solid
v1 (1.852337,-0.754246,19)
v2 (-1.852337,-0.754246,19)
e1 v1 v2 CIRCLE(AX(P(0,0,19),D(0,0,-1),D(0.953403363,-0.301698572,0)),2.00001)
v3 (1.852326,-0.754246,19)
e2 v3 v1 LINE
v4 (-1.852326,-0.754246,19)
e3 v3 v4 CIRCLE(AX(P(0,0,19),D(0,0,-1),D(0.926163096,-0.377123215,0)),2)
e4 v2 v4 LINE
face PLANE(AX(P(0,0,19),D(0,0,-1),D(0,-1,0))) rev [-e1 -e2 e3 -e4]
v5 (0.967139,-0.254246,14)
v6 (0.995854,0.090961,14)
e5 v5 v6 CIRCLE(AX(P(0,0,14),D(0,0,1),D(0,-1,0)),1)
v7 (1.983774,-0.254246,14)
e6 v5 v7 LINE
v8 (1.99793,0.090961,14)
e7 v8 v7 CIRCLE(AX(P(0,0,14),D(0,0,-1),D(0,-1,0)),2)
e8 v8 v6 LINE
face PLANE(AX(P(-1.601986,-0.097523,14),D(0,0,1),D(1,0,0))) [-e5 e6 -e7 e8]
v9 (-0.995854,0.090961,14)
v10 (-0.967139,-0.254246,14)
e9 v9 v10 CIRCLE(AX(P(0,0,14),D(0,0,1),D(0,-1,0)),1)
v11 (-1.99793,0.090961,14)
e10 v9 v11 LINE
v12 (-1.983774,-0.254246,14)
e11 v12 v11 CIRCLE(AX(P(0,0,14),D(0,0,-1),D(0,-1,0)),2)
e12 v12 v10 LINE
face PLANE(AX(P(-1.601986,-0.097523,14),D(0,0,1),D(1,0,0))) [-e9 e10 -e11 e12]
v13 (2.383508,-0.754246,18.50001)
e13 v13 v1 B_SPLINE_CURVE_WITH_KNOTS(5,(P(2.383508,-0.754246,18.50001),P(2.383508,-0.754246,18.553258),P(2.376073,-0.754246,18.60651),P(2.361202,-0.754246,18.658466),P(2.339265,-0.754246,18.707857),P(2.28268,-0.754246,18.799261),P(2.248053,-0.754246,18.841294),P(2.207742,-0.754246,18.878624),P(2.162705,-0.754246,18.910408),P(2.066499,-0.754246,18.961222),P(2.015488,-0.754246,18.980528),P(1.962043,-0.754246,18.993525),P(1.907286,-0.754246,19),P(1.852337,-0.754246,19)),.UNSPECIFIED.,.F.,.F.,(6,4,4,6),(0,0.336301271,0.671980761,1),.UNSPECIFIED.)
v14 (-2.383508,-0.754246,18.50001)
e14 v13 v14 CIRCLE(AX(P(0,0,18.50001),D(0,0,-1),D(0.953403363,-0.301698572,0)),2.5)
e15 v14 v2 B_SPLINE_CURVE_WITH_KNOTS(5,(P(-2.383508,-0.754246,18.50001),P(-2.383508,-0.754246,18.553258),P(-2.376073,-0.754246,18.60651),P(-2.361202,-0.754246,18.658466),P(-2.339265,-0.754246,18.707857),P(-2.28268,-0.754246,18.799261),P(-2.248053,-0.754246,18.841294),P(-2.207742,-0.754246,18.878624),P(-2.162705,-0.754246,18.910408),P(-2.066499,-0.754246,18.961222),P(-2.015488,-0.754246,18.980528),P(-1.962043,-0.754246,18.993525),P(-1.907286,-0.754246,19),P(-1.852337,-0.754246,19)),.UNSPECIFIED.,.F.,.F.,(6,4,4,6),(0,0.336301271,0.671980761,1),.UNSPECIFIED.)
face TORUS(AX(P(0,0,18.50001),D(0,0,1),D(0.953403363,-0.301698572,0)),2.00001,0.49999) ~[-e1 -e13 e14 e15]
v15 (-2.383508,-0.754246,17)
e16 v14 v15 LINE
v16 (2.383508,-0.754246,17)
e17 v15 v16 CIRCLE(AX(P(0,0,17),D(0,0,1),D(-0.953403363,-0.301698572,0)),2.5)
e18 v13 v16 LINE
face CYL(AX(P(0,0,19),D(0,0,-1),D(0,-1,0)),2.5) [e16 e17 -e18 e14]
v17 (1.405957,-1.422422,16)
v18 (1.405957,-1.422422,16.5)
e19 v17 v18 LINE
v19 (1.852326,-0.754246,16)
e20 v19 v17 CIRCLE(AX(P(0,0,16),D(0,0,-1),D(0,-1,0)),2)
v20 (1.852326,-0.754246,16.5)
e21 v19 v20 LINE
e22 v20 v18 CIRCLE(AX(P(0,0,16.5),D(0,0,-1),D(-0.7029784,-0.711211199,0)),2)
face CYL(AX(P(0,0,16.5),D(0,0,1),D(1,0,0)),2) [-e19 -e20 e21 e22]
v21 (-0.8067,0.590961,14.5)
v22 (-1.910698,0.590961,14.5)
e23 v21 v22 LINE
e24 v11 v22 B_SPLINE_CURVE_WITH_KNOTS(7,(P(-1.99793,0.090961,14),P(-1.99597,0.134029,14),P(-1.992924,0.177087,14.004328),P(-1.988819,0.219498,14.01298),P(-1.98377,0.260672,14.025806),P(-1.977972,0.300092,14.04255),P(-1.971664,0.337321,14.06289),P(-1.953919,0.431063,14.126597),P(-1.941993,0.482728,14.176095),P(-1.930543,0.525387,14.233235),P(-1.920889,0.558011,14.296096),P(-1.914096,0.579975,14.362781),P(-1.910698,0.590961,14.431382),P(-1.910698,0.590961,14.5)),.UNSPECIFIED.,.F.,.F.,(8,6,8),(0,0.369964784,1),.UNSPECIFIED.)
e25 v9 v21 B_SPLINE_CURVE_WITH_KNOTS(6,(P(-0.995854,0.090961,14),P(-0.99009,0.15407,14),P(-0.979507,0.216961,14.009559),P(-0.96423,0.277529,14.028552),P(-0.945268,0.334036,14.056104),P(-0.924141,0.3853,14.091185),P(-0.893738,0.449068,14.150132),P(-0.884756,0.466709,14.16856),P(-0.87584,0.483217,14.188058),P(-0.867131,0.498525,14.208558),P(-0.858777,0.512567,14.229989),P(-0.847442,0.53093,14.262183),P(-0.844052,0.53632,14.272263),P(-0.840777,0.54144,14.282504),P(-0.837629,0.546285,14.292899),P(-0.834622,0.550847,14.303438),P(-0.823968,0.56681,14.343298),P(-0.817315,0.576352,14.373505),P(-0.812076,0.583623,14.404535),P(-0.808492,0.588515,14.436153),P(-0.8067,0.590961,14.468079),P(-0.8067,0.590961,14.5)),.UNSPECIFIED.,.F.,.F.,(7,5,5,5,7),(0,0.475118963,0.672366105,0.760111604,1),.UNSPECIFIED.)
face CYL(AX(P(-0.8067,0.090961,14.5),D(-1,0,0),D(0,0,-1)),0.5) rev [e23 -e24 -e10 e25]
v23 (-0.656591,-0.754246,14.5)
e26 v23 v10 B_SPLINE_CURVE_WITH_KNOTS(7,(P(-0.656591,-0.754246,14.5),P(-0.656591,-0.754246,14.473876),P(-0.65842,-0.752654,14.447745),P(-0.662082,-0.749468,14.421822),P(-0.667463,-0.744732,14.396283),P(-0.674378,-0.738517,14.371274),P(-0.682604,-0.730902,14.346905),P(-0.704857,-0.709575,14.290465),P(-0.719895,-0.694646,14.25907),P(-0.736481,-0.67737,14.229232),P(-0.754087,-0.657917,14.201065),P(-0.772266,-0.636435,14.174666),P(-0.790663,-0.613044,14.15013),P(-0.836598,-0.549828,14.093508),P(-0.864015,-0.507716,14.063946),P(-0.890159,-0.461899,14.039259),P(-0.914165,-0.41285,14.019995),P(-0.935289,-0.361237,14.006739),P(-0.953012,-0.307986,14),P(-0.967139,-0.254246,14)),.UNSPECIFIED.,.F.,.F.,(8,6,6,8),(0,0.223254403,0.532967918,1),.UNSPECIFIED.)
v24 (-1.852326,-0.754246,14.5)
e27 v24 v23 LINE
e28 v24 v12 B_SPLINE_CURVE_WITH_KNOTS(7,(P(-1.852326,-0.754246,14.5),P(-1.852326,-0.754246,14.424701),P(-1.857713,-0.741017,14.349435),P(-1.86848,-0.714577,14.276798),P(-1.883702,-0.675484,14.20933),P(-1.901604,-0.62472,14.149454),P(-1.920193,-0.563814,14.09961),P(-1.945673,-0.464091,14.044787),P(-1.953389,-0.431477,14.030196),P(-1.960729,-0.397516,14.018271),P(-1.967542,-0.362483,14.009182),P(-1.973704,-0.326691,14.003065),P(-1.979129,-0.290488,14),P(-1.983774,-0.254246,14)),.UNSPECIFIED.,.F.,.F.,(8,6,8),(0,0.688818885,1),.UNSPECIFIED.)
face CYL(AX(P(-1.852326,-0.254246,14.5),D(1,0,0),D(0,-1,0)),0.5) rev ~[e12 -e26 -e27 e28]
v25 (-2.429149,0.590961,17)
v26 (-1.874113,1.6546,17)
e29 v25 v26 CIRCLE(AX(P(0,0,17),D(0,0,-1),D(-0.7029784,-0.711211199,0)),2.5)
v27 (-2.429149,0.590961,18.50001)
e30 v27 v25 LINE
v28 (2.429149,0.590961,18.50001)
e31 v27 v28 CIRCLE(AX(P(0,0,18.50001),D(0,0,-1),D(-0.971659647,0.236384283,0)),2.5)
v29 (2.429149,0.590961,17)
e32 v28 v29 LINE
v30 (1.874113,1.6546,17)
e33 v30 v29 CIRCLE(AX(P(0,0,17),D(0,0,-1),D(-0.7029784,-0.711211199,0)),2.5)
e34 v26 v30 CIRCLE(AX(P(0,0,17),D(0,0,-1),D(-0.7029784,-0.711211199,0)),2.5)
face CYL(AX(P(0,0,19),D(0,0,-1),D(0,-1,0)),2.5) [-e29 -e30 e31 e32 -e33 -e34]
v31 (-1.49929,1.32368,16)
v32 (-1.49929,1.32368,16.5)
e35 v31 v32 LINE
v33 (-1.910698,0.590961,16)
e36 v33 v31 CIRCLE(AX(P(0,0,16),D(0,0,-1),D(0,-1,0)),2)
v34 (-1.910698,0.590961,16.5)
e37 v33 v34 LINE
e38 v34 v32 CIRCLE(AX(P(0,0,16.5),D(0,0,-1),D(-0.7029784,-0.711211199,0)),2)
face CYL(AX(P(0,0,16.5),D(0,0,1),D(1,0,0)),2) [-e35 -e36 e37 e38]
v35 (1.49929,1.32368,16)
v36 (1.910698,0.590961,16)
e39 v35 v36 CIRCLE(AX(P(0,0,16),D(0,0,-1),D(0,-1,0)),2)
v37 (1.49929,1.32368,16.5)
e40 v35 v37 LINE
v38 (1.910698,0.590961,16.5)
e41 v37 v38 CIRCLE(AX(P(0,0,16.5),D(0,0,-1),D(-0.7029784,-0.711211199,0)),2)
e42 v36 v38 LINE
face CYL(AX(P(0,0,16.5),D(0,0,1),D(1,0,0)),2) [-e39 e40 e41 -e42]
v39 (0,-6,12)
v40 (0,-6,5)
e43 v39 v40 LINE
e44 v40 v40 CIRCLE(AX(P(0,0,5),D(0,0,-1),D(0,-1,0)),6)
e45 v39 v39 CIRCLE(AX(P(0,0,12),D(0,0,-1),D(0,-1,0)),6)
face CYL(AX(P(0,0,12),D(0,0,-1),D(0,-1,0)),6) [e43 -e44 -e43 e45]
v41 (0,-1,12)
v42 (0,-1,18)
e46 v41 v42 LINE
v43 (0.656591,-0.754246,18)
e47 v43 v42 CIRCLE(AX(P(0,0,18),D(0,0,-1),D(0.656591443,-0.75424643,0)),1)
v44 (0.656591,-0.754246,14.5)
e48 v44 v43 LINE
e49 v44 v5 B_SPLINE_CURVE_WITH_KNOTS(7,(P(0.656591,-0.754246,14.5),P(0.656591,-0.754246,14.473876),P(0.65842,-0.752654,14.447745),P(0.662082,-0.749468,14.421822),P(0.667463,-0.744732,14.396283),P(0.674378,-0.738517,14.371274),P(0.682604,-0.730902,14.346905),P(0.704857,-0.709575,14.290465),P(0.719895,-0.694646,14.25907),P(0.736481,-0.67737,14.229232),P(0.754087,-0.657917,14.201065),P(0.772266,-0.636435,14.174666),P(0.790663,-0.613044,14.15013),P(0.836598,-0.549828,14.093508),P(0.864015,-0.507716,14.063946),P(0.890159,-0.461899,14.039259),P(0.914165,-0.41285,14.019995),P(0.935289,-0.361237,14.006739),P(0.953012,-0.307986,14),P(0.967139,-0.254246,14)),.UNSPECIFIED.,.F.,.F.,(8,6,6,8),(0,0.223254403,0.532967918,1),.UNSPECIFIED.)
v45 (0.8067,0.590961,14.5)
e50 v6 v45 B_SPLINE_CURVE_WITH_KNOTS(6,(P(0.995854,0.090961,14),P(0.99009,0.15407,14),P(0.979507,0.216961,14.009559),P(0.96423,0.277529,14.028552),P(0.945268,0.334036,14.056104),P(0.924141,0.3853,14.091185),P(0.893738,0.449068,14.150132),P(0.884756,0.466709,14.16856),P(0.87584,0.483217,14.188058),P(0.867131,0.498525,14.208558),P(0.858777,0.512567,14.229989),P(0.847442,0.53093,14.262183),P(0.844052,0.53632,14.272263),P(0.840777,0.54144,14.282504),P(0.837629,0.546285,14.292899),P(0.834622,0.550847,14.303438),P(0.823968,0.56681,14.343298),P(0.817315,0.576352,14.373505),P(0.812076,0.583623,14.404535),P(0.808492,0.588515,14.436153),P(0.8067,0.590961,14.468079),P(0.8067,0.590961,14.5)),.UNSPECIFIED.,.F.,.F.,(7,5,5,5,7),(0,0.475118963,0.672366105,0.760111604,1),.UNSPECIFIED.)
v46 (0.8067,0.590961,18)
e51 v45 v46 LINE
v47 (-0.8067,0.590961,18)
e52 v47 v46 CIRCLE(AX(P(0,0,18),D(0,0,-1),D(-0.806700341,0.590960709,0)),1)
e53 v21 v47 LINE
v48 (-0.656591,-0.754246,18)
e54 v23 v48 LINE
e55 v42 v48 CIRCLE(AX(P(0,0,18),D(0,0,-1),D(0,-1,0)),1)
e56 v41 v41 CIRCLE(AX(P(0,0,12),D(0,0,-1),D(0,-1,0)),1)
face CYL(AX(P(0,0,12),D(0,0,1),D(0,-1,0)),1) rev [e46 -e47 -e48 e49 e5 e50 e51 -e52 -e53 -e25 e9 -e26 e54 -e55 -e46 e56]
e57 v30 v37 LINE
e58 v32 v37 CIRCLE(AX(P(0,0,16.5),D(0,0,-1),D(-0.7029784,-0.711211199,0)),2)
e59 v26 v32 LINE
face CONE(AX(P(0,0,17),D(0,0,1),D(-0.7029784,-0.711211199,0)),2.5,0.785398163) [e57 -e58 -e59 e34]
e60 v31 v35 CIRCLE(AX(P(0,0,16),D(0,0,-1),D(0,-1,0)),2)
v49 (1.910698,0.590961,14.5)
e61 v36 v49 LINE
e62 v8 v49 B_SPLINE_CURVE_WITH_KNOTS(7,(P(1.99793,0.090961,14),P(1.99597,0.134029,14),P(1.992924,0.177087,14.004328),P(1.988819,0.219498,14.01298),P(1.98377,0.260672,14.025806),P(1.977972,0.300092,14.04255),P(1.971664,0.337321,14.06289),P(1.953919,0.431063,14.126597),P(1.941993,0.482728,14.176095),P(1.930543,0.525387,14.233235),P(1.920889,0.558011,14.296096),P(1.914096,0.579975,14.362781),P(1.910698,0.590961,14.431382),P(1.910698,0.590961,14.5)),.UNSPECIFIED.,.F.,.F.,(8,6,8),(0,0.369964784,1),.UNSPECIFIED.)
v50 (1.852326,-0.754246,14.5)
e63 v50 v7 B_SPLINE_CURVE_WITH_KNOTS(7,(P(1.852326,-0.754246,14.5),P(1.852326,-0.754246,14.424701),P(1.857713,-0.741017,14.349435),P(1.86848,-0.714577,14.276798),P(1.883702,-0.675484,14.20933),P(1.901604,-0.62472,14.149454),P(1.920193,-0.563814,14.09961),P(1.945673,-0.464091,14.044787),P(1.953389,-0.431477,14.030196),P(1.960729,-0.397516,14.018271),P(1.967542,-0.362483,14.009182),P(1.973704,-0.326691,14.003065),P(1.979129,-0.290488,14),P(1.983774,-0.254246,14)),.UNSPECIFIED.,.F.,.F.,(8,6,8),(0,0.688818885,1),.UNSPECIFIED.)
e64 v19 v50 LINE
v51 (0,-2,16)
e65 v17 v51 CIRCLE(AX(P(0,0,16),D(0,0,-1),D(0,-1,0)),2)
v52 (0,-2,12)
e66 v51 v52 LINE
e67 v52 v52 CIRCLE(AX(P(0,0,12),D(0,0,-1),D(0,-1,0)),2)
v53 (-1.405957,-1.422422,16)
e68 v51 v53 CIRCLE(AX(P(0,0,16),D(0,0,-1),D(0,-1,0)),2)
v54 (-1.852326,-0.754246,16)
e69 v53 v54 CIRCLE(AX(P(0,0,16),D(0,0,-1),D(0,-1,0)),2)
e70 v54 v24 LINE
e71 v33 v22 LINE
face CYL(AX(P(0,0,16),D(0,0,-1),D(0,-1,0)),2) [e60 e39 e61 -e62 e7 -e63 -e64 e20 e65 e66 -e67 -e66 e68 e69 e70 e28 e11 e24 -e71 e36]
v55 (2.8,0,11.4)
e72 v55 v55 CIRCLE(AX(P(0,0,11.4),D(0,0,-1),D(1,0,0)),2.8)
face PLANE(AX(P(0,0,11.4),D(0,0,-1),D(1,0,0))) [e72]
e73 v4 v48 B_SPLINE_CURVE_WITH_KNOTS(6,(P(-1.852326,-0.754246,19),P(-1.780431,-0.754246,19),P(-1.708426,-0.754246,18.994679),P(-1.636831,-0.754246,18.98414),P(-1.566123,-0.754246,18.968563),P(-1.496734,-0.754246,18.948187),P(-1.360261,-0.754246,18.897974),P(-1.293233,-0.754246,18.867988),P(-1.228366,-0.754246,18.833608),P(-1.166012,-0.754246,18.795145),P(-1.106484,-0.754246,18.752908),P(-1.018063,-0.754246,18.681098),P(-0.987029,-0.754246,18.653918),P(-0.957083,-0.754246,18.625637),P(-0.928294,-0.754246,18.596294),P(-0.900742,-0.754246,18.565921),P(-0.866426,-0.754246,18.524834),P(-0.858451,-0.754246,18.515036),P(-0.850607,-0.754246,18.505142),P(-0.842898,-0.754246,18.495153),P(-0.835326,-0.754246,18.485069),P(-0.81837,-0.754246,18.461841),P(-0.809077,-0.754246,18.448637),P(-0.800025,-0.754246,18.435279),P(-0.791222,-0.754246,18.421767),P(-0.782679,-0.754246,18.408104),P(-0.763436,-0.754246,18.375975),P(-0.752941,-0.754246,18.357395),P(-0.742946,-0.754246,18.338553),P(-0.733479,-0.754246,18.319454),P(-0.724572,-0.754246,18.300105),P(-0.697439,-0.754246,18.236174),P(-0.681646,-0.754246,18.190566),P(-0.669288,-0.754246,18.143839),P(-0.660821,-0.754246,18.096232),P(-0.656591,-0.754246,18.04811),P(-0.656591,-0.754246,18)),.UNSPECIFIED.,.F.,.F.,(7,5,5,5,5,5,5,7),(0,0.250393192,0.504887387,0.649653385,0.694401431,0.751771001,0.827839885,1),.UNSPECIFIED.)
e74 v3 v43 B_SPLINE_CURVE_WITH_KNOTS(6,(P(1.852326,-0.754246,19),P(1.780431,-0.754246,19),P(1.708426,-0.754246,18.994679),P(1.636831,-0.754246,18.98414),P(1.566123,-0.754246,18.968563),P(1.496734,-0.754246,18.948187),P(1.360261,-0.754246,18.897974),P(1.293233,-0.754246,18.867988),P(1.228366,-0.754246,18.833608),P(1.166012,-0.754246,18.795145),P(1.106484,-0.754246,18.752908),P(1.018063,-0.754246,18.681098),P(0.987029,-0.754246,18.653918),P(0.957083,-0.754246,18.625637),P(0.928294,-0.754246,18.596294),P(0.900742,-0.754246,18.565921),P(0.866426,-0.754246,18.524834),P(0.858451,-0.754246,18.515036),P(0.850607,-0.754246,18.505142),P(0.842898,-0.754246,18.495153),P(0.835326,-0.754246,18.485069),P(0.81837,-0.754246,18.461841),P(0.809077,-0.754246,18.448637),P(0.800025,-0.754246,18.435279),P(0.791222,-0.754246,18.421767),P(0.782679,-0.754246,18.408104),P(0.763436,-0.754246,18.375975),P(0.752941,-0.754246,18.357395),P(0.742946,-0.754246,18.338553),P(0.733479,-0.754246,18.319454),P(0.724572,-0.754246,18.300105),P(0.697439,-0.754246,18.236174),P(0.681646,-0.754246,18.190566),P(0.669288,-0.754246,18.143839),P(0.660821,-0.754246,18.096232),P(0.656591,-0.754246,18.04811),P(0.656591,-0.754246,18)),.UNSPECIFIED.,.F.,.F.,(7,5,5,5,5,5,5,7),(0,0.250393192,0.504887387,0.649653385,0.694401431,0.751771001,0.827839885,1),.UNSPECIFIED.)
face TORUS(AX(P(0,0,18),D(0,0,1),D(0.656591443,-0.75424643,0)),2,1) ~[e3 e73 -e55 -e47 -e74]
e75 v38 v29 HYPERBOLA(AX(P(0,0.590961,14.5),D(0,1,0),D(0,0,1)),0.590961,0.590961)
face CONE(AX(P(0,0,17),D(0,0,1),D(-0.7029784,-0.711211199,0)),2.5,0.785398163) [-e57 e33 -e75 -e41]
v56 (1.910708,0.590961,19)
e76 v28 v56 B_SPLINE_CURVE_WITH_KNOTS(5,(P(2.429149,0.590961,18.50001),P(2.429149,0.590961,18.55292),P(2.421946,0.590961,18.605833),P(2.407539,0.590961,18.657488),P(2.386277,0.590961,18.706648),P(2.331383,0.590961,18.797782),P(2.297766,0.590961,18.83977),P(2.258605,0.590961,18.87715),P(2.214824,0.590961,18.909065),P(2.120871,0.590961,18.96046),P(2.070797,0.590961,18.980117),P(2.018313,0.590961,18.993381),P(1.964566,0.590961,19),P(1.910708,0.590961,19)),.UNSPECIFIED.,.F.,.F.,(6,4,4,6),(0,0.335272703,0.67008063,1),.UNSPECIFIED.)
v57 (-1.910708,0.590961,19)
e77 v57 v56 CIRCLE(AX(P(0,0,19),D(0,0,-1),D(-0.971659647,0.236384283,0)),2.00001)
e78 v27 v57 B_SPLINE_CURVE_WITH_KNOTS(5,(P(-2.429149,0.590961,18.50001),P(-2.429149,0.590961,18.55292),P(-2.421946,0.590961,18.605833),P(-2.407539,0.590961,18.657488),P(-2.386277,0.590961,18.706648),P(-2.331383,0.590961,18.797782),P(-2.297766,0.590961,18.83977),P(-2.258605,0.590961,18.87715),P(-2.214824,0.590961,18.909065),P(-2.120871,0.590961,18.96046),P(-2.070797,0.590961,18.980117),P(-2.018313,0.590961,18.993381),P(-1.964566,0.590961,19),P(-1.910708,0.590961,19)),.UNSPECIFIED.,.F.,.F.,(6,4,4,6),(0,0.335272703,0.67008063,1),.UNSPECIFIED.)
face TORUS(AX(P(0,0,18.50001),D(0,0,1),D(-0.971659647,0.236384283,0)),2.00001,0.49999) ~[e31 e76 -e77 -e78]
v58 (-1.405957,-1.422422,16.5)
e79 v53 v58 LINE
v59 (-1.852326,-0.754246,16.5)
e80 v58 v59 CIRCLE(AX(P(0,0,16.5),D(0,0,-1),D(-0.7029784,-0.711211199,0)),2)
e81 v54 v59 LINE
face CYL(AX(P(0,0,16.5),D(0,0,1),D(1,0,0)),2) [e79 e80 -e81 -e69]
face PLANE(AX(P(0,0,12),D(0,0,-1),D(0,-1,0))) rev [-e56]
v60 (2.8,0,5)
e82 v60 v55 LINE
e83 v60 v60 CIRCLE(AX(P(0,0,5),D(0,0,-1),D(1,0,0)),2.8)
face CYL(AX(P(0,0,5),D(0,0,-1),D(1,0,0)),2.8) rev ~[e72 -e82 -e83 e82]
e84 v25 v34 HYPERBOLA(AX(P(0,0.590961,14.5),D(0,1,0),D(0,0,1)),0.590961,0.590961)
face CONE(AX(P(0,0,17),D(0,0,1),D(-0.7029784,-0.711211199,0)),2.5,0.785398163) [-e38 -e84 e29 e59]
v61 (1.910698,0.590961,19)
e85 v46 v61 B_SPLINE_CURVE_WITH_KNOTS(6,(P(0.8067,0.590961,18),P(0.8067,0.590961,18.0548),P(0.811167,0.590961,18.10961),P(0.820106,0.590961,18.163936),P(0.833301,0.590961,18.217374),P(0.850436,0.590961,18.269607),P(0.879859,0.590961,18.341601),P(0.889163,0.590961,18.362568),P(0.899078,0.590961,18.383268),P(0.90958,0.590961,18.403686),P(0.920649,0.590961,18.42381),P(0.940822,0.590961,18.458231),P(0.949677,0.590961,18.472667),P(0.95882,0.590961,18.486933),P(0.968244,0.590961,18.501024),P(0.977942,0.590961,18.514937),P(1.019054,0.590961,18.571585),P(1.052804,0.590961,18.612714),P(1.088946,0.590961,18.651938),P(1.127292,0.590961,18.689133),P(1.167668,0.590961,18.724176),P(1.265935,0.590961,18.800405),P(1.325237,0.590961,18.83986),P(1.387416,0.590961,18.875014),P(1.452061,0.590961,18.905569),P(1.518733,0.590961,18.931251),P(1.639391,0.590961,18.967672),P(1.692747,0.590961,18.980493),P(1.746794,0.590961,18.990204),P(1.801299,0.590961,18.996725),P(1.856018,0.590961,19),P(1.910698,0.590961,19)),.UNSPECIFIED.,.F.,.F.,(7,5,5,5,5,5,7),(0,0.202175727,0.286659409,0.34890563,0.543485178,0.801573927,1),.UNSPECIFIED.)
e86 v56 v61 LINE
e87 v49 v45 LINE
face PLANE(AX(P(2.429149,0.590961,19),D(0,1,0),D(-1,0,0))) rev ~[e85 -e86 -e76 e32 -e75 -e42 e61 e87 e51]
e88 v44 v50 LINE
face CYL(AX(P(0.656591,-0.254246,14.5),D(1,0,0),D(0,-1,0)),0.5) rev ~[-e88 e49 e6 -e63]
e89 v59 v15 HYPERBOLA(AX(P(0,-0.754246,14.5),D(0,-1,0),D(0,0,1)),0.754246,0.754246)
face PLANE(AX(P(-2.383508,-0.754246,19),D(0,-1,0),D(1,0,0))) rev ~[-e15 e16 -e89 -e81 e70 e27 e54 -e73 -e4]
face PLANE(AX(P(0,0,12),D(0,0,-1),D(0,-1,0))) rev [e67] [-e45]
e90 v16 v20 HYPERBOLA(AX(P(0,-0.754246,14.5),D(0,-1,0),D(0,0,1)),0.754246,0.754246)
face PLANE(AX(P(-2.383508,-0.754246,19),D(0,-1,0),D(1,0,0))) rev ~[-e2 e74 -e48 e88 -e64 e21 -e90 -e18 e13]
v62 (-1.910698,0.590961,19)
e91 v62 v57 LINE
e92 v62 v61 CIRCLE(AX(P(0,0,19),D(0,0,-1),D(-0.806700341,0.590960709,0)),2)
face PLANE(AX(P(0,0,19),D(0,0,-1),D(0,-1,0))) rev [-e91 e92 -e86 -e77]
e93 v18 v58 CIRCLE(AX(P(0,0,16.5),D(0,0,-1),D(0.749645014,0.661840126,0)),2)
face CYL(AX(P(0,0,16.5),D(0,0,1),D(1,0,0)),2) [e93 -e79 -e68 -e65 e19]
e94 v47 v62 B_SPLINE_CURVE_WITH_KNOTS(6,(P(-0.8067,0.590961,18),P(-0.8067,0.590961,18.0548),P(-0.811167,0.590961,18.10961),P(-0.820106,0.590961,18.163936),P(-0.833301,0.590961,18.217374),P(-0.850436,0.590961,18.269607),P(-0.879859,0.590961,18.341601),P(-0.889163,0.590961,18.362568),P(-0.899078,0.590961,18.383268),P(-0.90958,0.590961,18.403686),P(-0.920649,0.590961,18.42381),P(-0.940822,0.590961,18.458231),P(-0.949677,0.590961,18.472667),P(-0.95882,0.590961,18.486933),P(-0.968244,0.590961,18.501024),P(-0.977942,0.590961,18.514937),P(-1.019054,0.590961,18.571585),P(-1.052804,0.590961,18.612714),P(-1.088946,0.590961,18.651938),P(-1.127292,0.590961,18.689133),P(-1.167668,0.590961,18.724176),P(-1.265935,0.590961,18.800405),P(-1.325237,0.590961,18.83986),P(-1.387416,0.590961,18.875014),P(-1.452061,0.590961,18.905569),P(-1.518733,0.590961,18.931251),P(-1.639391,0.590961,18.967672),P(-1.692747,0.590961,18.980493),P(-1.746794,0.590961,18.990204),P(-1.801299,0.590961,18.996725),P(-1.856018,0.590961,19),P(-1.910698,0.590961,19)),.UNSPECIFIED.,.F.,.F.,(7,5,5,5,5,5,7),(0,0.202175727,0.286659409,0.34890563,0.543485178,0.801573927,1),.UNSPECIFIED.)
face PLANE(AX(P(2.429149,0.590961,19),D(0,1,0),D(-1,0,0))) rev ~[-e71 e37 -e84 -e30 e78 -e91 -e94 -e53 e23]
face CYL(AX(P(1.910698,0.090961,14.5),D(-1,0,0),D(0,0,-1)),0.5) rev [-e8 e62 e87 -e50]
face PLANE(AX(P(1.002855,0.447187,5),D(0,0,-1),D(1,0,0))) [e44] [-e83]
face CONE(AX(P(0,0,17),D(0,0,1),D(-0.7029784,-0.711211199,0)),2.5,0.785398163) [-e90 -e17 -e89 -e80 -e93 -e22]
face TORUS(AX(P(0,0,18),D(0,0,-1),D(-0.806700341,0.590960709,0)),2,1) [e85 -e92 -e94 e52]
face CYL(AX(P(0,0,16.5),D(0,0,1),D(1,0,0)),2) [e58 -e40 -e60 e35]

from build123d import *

# Parameters (mm, degrees)
F3_DEPTH     = 5
F4_T4_ANGLE  = 270.6670948428
F4_S5_R      = 2
F4_T6_DEPTH  = 5
F4_T10_ANGLE = 262.8807253971
F4_S11_R     = 2
F4_T12_DEPTH = 5
F5_SIZE      = 1
F6_R         = 1
F7_R         = 0.49999
F8_R         = 0.5
F9_W         = 20.6344220787
F9_H         = 19.8933202773
F9_R         = 5
F10_DEPTH    = 5
F11_R        = 2.8
F12_DEPTH    = 6.4


# Not quite as in the source:
# - a fillet or chamfer that OpenCascade refuses, or shapes differently, is made with other operations: its cross-section is extruded or revolved along the edge and cut away or added
# - a fillet or chamfer is up to 0.001 mm smaller than in the source, because OpenCascade refuses the exact size


with BuildPart() as f1:
    # F0 (on Right) → F1 (revolve)
    with BuildSketch(Plane.YZ):
        Polygon((-6, 0), (0, 0), (0, 12), (-1, 12), (-1, 16), (-1, 19), (-2, 19), (-2.5, 19), (-2.5, 16), (-2, 16), (-2, 12), (-6, 12), align=None)
    revolve(axis=Axis((0, 0, 6), (0, 0, -1)))

    # F2 (on face) → F3 (cut)
    with BuildSketch(Plane.XY.offset(19)):
        with BuildLine():
            Line((-0.8067003414, 0.5909607086), (-2.4291491187, 0.5909607086))
            ThreePointArc((-2.4291491187, 0.5909607086), (-2.4985623215, -0.0847721969), (-2.3835084063, -0.75424643))
            Line((-2.3835084063, -0.75424643), (-0.6565914428, -0.75424643))
            ThreePointArc((-0.6565914428, -0.75424643), (-0.993831612, -0.1108996261), (-0.8067003414, 0.5909607086))
        make_face()
        with BuildLine():
            ThreePointArc((1, 0), (0.9504473529, 0.3108855566), (0.8067003414, 0.5909607086))
            Line((0.8067003414, 0.5909607086), (-0.8067003414, 0.5909607086))
            ThreePointArc((-0.8067003414, 0.5909607086), (-0.993831612, -0.1108996261), (-0.6565914428, -0.75424643))
            Line((-0.6565914428, -0.75424643), (0.6565914428, -0.75424643))
            ThreePointArc((0.6565914428, -0.75424643), (0.9101075329, -0.4143721499), (1, 0))
        make_face()
        with BuildLine():
            ThreePointArc((2.5, 0), (2.482224083, 0.2975963737), (2.4291491187, 0.5909607086))
            Line((2.4291491187, 0.5909607086), (0.8067003414, 0.5909607086))
            ThreePointArc((0.8067003414, 0.5909607086), (0.9504473529, 0.3108855566), (1, 0))
            ThreePointArc((1, 0), (0.9101075329, -0.4143721499), (0.6565914428, -0.75424643))
            Line((0.6565914428, -0.75424643), (2.3835084063, -0.75424643))
            ThreePointArc((2.3835084063, -0.75424643), (2.4707054676, -0.38159467), (2.5, 0))
        make_face()
    extrude(amount=-F3_DEPTH, mode=Mode.SUBTRACT)

    # F4: chamfer of 1 on 2 edges, made by hand


with BuildPart() as f4_tool2:
    # F4_s3 → F4_t4 (revolve)
    with BuildSketch(Plane(origin=(0, 0, 0), x_dir=(0, 0, 1), z_dir=(0.7112111987, -0.7029784, 0))):
        Polygon((17, 2.5), (16, 1.5), (16, 2.5), align=None)
    revolve(axis=Axis((0, 0, 16), (0, 0, -1)), revolution_arc=F4_T4_ANGLE)

    # F4_s5 → F4_t6 (cut, symmetric)
    with BuildSketch(Plane.XY.offset(16.5)):
        Circle(F4_S5_R)
    extrude(amount=F4_T6_DEPTH, both=True, mode=Mode.SUBTRACT)


with BuildPart() as f1_1:
    add(f1.part)

    # F4_t1: cut F4_tool2
    add(f4_tool2.part, mode=Mode.SUBTRACT)


with BuildPart() as f4_tool8:
    # F4_s9 → F4_t10 (revolve)
    with BuildSketch(Plane(origin=(0, 0, 0), x_dir=(0, 0, 1), z_dir=(-0.6618401259, 0.7496450145, 0))):
        Polygon((17, 2.5), (16, 1.5), (16, 2.5), align=None)
    revolve(axis=Axis((0, 0, 16), (0, 0, -1)), revolution_arc=F4_T10_ANGLE)

    # F4_s11 → F4_t12 (cut, symmetric)
    with BuildSketch(Plane.XY.offset(16.5)):
        Circle(F4_S11_R)
    extrude(amount=F4_T12_DEPTH, both=True, mode=Mode.SUBTRACT)


with BuildPart() as f1_2:
    add(f1_1.part)

    # F4_t7: cut F4_tool8
    add(f4_tool8.part, mode=Mode.SUBTRACT)

    # F5
    f5_edges = [f1_2.edges().sort_by_distance(p)[0] for p in [
        (0, 6, 0),
    ]]
    chamfer(f5_edges, length=F5_SIZE)

    # F6
    f6_edges = [f1_2.edges().sort_by_distance(p)[0] for p in [
        (0, 1, 19),
        (-0.350538, -0.936549, 19),
        (0.350538, -0.936549, 19),
    ]]
    fillet(f6_edges, radius=F6_R)

    # F7 (radius 0.5 in the source; OpenCascade refuses exactly that, so slightly less here)
    f7_edges = [f1_2.edges().sort_by_distance(p)[0] for p in [
        (0, -2.5, 19),
        (0, 2.5, 19),
    ]]
    fillet(f7_edges, radius=F7_R)

    # F8
    f8_edges = [f1_2.edges().sort_by_distance(p)[0] for p in [
        (-1.254459, -0.754246, 14),
        (1.254459, -0.754246, 14),
        (-1.358699, 0.590961, 14),
        (1.358699, 0.590961, 14),
    ]]
    fillet(f8_edges, radius=F8_R)

    # F9 (on face) → F10 (cut)
    with BuildSketch(Plane(origin=(0, 0, 0), x_dir=(1, 0, 0), z_dir=(0, 0, -1))):
        with Locations((1.0028546676, -0.4471866414)):
            Rectangle(F9_W, F9_H)
        Circle(F9_R, mode=Mode.SUBTRACT)
        Circle(F9_R)
    extrude(amount=-F10_DEPTH, mode=Mode.SUBTRACT)

    # F11 (on face) → F12 (cut)
    with BuildSketch(Plane(origin=(0, 0, 5), x_dir=(1, 0, 0), z_dir=(0, 0, -1))):
        Circle(F11_R)
    extrude(amount=-F12_DEPTH, mode=Mode.SUBTRACT)


solid = f1_2.part
